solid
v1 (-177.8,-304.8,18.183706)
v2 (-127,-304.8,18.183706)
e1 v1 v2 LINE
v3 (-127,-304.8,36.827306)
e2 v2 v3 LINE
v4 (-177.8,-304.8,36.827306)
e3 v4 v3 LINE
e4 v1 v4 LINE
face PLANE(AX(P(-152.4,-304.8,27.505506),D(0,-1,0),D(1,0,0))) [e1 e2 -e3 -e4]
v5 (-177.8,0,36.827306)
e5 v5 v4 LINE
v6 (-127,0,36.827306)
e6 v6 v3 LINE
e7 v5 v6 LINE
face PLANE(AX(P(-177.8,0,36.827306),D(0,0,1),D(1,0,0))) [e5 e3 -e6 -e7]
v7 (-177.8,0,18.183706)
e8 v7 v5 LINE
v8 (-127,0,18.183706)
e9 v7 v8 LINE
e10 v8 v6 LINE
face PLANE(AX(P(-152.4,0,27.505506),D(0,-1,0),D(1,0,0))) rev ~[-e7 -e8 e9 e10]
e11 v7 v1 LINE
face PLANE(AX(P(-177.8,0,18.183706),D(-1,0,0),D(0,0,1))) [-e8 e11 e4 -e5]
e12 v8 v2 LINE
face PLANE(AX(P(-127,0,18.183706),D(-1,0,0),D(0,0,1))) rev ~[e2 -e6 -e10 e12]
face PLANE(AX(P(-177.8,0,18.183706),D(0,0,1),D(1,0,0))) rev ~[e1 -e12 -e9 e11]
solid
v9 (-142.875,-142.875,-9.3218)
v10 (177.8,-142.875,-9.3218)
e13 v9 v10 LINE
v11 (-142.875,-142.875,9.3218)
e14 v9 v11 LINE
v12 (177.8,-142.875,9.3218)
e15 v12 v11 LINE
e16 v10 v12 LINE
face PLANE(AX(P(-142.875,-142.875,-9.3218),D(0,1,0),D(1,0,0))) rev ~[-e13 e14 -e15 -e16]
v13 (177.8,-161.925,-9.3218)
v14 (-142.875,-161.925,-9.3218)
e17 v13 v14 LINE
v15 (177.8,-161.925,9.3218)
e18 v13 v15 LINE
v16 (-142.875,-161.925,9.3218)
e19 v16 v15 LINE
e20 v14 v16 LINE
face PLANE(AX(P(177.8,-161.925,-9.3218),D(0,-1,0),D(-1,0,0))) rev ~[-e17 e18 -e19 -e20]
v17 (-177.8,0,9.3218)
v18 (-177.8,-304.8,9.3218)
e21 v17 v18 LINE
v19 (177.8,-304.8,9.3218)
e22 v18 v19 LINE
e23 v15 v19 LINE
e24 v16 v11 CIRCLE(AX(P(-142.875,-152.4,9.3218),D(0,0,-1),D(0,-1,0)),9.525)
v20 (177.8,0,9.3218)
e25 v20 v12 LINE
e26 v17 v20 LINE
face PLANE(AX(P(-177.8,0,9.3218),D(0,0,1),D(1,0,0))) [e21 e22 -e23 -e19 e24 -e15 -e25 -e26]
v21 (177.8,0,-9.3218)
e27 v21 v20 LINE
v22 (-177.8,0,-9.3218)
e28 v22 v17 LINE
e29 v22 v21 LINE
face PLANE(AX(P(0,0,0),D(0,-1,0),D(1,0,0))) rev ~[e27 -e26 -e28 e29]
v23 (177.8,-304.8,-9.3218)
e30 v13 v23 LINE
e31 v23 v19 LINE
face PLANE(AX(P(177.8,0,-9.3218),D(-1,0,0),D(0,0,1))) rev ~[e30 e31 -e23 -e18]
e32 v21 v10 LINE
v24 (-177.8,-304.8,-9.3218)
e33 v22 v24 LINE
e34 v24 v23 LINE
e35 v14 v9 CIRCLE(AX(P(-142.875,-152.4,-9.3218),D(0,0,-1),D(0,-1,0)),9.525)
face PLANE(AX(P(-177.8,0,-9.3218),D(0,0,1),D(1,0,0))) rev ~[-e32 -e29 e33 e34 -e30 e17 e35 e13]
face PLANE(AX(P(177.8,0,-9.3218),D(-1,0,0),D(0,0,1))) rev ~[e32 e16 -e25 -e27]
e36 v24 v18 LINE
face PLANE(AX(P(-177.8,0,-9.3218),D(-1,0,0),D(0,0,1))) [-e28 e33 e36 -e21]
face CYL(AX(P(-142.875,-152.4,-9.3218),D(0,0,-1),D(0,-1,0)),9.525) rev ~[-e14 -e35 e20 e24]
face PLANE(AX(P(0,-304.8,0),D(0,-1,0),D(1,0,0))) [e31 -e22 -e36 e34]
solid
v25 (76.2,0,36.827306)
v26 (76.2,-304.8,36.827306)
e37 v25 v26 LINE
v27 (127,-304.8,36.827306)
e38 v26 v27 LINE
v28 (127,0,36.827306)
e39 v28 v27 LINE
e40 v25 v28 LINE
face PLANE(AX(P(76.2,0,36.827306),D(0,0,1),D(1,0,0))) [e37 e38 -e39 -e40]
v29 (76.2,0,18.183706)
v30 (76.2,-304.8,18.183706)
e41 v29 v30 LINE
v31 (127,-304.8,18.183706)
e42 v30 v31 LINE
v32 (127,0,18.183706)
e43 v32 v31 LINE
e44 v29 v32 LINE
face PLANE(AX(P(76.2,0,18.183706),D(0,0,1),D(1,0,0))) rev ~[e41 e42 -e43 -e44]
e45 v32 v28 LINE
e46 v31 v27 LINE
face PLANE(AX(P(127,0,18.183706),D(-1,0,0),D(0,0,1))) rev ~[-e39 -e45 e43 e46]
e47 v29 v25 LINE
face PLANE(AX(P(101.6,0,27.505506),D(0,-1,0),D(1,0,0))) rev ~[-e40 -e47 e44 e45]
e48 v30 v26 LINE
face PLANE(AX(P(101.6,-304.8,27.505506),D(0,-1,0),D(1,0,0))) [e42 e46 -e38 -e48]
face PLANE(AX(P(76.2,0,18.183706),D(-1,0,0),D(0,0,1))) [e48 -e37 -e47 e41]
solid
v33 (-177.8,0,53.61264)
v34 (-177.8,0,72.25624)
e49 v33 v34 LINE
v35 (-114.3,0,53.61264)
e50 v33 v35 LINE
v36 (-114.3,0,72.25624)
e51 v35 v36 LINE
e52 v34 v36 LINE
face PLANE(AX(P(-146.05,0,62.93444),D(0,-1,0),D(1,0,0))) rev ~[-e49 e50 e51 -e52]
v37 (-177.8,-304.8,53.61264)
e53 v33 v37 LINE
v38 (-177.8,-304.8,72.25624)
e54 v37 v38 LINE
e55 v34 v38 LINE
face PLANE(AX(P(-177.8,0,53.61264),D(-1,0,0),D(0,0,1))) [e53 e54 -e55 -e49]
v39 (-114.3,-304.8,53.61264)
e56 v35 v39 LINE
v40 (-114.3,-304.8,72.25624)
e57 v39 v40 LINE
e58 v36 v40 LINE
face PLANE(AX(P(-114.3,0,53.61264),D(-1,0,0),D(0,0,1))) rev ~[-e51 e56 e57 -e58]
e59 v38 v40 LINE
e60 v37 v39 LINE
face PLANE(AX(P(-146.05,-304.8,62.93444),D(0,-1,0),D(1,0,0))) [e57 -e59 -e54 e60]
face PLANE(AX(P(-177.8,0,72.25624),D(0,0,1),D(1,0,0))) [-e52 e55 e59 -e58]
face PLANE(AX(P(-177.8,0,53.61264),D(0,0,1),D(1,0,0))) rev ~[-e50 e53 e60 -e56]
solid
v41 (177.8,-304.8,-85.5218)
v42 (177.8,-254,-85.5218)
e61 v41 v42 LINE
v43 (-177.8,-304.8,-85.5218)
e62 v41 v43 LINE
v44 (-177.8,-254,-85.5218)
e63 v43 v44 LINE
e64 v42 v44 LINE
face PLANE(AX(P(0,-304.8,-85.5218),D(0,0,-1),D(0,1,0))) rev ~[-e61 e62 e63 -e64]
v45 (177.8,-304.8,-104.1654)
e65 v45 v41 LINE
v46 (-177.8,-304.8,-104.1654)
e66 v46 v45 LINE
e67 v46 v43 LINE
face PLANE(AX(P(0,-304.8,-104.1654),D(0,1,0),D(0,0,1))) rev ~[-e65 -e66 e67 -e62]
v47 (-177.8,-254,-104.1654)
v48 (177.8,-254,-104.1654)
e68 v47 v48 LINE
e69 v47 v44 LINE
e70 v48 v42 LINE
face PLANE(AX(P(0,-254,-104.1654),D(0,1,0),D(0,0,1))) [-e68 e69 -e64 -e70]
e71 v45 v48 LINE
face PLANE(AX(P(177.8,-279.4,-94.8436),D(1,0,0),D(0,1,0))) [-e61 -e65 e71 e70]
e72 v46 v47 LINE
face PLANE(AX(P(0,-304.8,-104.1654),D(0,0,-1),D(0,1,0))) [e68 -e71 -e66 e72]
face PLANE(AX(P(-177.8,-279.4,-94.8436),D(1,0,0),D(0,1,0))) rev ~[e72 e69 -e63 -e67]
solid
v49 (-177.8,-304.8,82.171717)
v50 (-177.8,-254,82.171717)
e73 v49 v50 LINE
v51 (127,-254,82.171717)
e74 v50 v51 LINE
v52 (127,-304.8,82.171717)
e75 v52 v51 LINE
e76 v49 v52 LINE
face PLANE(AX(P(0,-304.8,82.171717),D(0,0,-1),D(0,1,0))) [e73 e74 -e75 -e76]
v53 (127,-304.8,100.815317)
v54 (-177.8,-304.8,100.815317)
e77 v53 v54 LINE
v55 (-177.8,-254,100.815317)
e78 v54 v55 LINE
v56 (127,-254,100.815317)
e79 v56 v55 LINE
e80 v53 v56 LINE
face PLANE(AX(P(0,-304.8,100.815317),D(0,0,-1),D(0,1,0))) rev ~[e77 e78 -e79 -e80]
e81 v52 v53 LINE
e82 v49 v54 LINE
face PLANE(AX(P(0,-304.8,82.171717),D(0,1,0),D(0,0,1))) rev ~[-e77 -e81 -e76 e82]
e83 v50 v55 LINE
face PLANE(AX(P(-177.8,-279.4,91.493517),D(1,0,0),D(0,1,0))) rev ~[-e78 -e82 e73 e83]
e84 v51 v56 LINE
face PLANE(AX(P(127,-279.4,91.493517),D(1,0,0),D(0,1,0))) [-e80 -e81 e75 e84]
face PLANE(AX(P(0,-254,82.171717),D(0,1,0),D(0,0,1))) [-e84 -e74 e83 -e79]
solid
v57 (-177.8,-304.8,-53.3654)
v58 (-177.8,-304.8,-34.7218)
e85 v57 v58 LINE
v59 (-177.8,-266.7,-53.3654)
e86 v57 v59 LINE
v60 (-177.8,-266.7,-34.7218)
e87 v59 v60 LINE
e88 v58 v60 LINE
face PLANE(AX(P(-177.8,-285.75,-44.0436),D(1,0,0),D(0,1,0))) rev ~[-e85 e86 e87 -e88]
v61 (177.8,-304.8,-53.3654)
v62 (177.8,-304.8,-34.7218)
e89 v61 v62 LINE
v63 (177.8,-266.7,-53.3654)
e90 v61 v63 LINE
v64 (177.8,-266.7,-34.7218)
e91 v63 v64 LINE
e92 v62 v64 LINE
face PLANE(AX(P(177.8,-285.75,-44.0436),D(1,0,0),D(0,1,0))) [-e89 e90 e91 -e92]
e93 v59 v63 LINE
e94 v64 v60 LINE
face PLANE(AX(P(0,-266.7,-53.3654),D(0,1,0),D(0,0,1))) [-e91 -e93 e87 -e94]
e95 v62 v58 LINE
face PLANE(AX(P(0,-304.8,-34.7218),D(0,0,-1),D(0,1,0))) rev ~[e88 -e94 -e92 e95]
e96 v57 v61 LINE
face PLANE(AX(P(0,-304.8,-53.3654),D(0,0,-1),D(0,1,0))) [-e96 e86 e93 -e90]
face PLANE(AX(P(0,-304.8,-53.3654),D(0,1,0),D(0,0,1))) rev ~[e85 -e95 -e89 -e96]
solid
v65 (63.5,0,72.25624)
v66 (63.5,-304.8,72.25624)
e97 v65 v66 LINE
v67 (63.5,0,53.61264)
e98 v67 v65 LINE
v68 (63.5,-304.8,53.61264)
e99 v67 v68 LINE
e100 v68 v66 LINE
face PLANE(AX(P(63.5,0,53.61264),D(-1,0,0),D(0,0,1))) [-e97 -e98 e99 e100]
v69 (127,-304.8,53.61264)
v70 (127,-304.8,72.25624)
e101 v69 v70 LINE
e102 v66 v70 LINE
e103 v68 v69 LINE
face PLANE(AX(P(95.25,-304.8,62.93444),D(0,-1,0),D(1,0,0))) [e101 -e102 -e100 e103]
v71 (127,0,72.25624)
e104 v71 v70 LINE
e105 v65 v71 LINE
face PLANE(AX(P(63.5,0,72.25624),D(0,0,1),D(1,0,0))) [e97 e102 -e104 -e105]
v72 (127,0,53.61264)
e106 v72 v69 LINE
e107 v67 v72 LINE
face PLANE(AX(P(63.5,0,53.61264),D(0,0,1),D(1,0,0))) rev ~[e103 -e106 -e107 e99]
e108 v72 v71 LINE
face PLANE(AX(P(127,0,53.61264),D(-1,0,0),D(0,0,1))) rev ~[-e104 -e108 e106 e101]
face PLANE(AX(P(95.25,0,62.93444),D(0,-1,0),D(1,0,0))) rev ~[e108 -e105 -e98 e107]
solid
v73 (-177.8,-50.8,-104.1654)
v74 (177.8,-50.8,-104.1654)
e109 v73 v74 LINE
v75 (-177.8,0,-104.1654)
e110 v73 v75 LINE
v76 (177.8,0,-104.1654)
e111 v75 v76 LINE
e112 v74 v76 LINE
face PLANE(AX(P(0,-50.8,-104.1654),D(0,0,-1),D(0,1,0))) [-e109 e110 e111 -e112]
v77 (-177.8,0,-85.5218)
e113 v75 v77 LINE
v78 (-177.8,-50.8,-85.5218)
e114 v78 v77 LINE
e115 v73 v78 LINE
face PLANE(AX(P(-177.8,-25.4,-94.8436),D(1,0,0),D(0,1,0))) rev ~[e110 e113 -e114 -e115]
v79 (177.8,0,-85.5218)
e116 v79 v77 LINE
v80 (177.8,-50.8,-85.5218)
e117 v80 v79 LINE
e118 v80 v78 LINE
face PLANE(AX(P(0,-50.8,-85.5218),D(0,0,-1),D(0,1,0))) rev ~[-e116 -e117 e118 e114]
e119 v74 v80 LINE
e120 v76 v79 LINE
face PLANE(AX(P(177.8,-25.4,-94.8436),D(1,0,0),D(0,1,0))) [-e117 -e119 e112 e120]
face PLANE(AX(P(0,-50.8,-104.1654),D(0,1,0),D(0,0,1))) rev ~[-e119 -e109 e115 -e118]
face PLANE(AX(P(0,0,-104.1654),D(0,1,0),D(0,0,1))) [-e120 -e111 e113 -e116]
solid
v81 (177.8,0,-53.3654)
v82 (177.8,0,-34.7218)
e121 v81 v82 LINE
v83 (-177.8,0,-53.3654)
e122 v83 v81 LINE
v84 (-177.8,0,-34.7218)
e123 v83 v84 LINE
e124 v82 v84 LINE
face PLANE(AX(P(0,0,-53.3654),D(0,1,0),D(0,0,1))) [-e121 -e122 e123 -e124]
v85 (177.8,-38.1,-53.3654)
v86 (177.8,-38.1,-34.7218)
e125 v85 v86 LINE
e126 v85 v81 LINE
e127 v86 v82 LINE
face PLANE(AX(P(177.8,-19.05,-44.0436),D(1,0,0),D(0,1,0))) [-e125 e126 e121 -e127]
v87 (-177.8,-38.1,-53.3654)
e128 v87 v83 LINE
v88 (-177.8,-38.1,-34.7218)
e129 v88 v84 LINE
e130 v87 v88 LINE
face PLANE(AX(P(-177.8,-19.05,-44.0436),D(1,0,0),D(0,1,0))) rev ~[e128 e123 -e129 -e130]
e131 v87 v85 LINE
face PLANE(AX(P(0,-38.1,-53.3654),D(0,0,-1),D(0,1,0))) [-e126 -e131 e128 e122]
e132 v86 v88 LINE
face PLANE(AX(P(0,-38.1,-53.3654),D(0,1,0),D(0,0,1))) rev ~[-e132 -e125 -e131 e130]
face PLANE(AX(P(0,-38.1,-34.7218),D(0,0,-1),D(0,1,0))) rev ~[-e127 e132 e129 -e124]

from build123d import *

# Parameters (mm, degrees)
F0_W          = 63.5
F0_H          = 18.6436
F1_DEPTH      = 304.8
F0_W_2        = 50.8
F0_W_3        = 355.6
F3_DEPTH      = 81.5790404614
F4_W          = 50.8
F4_H          = 18.6436
F5_DEPTH      = 177.8
F4_W_2        = 38.1
F6_W          = 50.8
F6_H          = 18.6436
F7_DEPTH      = 127
F7_DEPTH_BACK = 177.8


with BuildPart() as f1:
    # F0 (on Front) → F1 (new body)
    with BuildSketch(Plane.XZ):
        with Locations((-146.05, 62.9344404614)):
            Rectangle(F0_W, F0_H)
    extrude(amount=F1_DEPTH)


with BuildPart() as f1b:
    # F0 (on Front) → F1, piece 2 (new body)
    with BuildSketch(Plane.XZ):
        with Locations((-152.4, 27.5055062211)):
            Rectangle(F0_W_2, F0_H)
    extrude(amount=F1_DEPTH)


with BuildPart() as f1c:
    # F0 (on Front) → F1, piece 3 (new body)
    with BuildSketch(Plane.XZ):
        Rectangle(F0_W_3, F0_H)
    extrude(amount=F1_DEPTH)

    # F2 (on face) → F3 (cut, through all)
    with BuildSketch(Plane(origin=(0, 0, -9.3218), x_dir=(1, 0, 0), z_dir=(0, 0, -1))):
        with BuildLine():
            Line((177.8, 161.925), (-142.875, 161.925))
            ThreePointArc((-142.875, 161.925), (-152.4, 152.4), (-142.875, 142.875))
            Line((-142.875, 142.875), (177.8, 142.875))
            Line((177.8, 142.875), (177.8, 161.925))
        make_face()
    extrude(amount=-F3_DEPTH, mode=Mode.SUBTRACT)


with BuildPart() as f1d:
    # F0 (on Front) → F1, piece 4 (new body)
    with BuildSketch(Plane.XZ):
        with Locations((101.6, 27.5055062211)):
            Rectangle(F0_W_2, F0_H)
    extrude(amount=F1_DEPTH)


with BuildPart() as f1e:
    # F0 (on Front) → F1, piece 5 (new body)
    with BuildSketch(Plane.XZ):
        with Locations((95.25, 62.9344404614)):
            Rectangle(F0_W, F0_H)
    extrude(amount=F1_DEPTH)


with BuildPart() as f5:
    # F4 (on Right) → F5 (new body, symmetric)
    with BuildSketch(Plane.YZ):
        with Locations((-25.4, -94.8436)):
            Rectangle(F4_W, F4_H)
    extrude(amount=F5_DEPTH, both=True)


with BuildPart() as f5b:
    # F4 (on Right) → F5, piece 2 (new body, symmetric)
    with BuildSketch(Plane.YZ):
        with Locations((-279.4, -94.8436)):
            Rectangle(F4_W, F4_H)
    extrude(amount=F5_DEPTH, both=True)


with BuildPart() as f5c:
    # F4 (on Right) → F5, piece 3 (new body, symmetric)
    with BuildSketch(Plane.YZ):
        with Locations((-285.75, -44.0436)):
            Rectangle(F4_W_2, F4_H)
    extrude(amount=F5_DEPTH, both=True)


with BuildPart() as f5d:
    # F4 (on Right) → F5, piece 4 (new body, symmetric)
    with BuildSketch(Plane.YZ):
        with Locations((-19.05, -44.0436)):
            Rectangle(F4_W_2, F4_H)
    extrude(amount=F5_DEPTH, both=True)


with BuildPart() as f7:
    # F6 (on Right) → F7 (new body, two sides)
    with BuildSketch(Plane.YZ) as f7_sk:
        with Locations((-279.4, 91.4935171604)):
            Rectangle(F6_W, F6_H)
    extrude(amount=F7_DEPTH)
    extrude(f7_sk.sketch, amount=-F7_DEPTH_BACK)


solid = Compound([f1.part, f1b.part, f1c.part, f1d.part, f1e.part, f5.part, f5b.part, f5c.part, f5d.part, f7.part])
